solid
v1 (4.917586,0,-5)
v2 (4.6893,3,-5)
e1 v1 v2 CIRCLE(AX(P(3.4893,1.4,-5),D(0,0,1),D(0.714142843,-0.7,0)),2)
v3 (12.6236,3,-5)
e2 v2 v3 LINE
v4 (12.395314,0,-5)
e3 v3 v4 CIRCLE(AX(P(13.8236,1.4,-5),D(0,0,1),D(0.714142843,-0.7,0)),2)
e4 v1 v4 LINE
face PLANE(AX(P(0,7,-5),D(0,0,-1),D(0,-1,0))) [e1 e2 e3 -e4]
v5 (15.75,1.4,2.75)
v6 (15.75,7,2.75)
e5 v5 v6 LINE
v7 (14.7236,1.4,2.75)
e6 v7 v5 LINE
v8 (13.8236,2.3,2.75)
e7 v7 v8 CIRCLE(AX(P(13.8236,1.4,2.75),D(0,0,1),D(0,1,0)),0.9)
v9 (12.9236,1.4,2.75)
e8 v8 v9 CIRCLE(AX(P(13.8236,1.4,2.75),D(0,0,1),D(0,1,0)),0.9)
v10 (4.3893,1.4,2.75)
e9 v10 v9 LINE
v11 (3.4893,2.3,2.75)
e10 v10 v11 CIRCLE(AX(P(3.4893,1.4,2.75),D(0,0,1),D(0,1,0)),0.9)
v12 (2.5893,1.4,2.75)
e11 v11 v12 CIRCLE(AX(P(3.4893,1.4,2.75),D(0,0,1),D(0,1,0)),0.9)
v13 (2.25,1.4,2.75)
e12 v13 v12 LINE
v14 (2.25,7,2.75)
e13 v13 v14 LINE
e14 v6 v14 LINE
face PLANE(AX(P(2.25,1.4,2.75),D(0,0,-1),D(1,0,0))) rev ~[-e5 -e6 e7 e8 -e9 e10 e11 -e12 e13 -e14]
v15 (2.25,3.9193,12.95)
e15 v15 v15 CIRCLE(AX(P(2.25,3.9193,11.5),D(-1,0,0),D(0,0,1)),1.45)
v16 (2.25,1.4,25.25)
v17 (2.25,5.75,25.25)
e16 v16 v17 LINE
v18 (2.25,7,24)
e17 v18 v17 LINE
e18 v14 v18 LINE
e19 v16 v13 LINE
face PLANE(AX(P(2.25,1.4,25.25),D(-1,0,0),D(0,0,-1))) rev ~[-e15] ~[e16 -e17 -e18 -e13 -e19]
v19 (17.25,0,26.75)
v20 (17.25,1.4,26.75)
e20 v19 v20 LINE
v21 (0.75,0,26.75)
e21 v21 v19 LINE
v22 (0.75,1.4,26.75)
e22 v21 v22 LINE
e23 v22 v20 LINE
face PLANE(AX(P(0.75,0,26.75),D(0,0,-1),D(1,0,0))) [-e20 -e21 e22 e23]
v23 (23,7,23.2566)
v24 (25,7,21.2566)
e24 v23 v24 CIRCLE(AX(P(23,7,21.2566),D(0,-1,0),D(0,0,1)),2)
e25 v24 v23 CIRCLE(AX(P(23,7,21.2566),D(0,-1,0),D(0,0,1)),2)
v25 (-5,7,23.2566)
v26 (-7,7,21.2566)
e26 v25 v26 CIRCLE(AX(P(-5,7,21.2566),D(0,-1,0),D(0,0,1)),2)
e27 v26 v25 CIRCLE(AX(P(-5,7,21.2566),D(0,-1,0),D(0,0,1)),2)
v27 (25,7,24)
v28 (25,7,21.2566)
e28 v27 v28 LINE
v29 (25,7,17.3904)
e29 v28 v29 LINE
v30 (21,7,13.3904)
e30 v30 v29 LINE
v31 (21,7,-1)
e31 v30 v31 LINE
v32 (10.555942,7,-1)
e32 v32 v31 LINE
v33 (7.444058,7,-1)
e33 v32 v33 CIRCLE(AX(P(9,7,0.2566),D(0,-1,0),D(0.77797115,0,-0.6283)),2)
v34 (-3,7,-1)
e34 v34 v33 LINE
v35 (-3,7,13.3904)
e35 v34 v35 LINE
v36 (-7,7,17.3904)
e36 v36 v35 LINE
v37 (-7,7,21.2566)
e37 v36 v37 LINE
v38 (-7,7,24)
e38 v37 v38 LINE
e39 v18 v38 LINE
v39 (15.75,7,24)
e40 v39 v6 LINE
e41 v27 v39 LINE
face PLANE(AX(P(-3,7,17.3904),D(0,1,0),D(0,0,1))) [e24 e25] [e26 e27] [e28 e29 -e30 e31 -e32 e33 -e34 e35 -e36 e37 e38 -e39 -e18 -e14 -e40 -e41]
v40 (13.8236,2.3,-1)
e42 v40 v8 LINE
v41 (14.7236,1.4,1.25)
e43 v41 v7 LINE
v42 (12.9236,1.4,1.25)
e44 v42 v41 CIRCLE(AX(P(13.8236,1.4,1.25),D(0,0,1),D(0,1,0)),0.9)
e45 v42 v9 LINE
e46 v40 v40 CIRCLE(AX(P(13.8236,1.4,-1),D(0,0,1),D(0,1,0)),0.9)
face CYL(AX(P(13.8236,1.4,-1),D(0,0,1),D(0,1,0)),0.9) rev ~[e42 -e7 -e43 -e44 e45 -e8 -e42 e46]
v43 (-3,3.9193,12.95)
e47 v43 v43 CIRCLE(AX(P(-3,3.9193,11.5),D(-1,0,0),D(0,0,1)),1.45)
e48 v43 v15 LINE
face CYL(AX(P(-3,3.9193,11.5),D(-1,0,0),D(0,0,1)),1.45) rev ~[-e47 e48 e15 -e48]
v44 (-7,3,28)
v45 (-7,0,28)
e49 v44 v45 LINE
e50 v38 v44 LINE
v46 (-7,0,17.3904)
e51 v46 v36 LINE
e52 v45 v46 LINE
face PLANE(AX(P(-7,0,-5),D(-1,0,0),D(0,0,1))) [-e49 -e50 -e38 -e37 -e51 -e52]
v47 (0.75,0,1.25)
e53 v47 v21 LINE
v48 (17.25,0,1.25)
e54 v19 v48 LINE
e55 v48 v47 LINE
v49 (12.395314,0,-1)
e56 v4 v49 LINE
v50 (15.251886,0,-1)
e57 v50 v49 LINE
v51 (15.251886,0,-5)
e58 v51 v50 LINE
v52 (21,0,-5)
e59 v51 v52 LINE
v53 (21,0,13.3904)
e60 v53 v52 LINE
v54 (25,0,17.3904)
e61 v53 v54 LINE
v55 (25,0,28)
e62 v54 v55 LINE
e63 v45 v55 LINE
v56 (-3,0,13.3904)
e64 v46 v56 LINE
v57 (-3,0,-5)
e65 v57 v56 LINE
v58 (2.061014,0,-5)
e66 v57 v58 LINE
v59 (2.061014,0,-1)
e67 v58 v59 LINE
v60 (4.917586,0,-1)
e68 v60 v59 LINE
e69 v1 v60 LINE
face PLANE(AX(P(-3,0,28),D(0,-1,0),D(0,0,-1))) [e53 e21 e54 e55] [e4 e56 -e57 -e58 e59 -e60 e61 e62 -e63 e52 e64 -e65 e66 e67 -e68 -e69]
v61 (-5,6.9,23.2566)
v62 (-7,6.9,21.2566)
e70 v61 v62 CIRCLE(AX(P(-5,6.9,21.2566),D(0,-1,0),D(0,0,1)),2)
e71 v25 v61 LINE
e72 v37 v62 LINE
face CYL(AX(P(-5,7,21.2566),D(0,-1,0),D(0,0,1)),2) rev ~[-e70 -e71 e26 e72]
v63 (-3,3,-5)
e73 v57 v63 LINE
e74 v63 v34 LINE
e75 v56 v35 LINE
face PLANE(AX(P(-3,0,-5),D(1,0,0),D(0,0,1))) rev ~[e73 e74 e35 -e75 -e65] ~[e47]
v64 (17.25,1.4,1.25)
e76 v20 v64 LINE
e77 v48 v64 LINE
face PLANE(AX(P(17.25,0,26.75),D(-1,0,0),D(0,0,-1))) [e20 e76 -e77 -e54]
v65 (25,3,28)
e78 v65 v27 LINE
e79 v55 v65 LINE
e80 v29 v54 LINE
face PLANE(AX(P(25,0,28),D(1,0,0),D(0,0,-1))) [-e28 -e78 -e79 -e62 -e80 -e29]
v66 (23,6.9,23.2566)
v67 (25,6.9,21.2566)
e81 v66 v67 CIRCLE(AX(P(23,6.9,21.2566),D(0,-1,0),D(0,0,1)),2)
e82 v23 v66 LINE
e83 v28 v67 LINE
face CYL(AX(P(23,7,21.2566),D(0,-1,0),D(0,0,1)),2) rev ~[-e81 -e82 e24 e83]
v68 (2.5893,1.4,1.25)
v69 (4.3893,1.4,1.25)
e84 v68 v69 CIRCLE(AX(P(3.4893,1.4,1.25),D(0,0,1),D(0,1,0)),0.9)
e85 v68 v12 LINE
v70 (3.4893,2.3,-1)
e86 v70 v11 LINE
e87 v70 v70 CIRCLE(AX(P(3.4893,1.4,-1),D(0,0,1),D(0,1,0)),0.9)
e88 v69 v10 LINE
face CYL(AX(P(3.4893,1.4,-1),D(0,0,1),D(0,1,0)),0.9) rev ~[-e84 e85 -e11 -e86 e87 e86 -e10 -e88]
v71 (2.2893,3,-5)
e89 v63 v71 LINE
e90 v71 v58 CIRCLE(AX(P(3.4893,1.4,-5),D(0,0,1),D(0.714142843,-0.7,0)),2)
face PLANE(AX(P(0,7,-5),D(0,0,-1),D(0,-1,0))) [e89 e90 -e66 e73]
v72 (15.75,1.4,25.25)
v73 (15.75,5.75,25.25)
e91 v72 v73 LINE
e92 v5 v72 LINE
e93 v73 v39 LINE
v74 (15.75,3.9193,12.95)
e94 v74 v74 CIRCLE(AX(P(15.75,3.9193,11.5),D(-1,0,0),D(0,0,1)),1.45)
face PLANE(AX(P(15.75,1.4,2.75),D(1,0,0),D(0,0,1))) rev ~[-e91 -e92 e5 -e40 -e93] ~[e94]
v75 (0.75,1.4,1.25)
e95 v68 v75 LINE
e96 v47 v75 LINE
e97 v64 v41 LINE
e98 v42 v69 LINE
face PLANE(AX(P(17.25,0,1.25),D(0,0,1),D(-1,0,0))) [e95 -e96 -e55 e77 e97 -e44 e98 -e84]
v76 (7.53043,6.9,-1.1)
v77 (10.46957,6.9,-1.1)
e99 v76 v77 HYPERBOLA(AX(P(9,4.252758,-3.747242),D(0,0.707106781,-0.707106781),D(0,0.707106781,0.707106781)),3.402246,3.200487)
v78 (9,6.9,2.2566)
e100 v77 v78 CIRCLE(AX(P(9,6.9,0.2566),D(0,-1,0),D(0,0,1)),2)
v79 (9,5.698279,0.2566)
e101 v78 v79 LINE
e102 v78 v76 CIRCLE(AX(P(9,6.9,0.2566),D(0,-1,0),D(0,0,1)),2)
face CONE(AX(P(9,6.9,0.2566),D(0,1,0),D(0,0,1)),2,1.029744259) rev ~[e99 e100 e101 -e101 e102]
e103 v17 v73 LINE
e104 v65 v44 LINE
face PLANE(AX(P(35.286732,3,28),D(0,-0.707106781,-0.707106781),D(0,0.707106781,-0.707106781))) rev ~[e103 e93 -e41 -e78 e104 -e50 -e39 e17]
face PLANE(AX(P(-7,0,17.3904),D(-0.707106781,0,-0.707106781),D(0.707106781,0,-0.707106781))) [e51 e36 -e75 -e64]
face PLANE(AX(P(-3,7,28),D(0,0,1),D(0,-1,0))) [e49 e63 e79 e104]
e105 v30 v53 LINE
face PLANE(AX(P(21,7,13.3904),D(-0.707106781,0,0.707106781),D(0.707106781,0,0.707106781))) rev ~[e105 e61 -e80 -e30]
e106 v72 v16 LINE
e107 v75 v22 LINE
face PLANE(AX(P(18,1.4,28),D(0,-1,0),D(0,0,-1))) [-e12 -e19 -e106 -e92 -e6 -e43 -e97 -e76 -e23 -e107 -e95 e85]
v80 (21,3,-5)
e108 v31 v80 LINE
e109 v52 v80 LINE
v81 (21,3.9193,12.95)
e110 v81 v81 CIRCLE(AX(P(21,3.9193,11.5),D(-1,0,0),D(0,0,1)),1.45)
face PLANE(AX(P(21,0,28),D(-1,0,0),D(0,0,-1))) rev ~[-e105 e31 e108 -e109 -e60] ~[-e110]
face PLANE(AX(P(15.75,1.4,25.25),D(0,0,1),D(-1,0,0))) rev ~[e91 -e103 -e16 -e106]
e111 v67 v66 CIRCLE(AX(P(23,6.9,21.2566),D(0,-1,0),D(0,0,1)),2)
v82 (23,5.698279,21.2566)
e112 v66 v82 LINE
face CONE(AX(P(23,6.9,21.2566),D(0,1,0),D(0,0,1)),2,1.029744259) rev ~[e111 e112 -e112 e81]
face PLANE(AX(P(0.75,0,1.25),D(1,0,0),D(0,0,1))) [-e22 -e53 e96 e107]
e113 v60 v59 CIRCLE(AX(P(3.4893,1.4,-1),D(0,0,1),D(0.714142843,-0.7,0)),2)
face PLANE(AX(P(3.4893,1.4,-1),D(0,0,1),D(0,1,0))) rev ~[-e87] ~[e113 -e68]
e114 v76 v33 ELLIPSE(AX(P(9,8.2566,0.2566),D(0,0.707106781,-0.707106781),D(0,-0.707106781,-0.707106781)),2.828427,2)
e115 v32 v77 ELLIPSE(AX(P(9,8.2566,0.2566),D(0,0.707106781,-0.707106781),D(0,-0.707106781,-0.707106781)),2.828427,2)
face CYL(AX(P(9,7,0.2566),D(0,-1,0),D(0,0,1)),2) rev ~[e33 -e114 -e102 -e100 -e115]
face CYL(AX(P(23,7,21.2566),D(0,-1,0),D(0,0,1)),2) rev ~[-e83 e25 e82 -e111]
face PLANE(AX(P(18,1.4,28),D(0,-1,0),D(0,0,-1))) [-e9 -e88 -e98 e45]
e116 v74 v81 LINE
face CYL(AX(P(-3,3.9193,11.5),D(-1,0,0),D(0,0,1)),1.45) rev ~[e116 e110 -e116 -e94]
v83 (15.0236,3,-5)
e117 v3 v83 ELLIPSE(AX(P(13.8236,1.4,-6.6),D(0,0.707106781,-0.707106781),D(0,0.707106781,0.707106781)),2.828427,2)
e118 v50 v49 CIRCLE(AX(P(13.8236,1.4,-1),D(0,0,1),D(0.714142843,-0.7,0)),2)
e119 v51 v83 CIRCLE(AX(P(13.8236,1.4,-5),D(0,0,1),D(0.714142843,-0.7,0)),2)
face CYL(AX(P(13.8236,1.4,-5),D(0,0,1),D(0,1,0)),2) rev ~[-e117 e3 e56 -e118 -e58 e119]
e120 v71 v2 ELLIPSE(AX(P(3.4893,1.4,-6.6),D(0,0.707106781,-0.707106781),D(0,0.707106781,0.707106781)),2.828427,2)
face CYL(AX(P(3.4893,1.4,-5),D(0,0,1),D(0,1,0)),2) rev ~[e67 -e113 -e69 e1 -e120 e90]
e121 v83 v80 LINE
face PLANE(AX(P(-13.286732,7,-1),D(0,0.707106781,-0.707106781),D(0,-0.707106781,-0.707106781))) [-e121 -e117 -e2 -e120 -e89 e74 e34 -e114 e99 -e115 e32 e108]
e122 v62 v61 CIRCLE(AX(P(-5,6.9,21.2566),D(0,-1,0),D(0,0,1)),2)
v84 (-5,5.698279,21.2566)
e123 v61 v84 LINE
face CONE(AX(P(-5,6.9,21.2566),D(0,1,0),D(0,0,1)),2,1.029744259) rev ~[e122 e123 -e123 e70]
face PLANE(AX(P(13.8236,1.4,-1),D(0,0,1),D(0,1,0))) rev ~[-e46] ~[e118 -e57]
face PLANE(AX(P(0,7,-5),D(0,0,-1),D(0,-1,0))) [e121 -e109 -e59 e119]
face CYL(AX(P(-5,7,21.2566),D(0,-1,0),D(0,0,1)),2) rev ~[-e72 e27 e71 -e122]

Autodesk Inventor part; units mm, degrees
ref_plane "YZ Plane" through (0, 0, 0) normal (1, 0, 0) x (0, 1, 0)
ref_plane "XZ Plane" through (0, 0, 0) normal (0, 1, 0) x (-1, 0, 0)
ref_plane "XY Plane" through (0, 0, 0) normal (0, 0, 1) x (1, 0, 0)
sketch "Skizze1" plane through (0, 0, 0) normal (0, 1, 0) x (-1, 0, 0)
  line L0 (0, 0) -> (-18, 0)
  line L1 (-18, 0) -> (-18, 28)
  line L2 (-18, 28) -> (0, 28)
  line L3 (0, 28) -> (0, 0)
  dimension "d0" = 18
  dimension "d1" = 28
extrude "Extrusion1" add sketch "Skizze1" along normal blind 7
sketch "Skizze2" plane through (18, 0, 28) normal (0, -1, 0) x (0, 0, -1)
  line L0 (0, -18) -> (0, 0) projected
  line L1 (28, -18) -> (0, -18) projected
  line L2 (28, 0) -> (28, -18) projected
  line L3 (0, 0) -> (28, 0) projected
  line L4 (26.75, -17.25) -> (1.25, -17.25)
  line L5 (1.25, -17.25) -> (1.25, -0.75)
  line L6 (1.25, -0.75) -> (26.75, -0.75)
  line L7 (26.75, -0.75) -> (26.75, -17.25)
  line L8 (26.75, -17.25) -> (1.25, -0.75) construction
  line L9 (1.25, -17.25) -> (26.75, -0.75) construction
  point P0 (14, -9)
  dimension "d16" = 25.5
  dimension "d17" = 16.5
extrude "Extrusion2" cut sketch "Skizze2" against normal blind 1.4 contours L4 L5 L6 L7
sketch "Skizze5" plane through (18, 1.4, 28) normal (0, -1, 0) x (1, 0, 0)
  line L0 (-0.75, -1.25) -> (-0.75, -26.75) projected
  line L1 (-17.25, -1.25) -> (-0.75, -1.25) projected
  line L2 (-17.25, -26.75) -> (-17.25, -1.25) projected
  line L3 (-0.75, -26.75) -> (-17.25, -26.75) projected
  line L4 (-2.25, -25.25) -> (-2.25, -2.75)
  line L5 (-2.25, -2.75) -> (-15.75, -2.75)
  line L6 (-15.75, -2.75) -> (-15.75, -25.25)
  line L7 (-15.75, -25.25) -> (-2.25, -25.25)
  point P0 (-18, -28)
  dimension "d18" = 1.5
extrude "Extrusion5" cut sketch "Skizze5" against normal blind 6 contours L7 L6 L5 L4
ref_plane "Arbeitsebene2" through (9, 0, 0) normal (-0.7071068, 0, -0.7071068) x (0, 1, 0)
ref_plane "Arbeitsebene1" through (9, 0, 0) normal (-1, 0, 0) x (0, 0, 1)
ref_plane "Arbeitsebene3" through (0, 0, 14) normal (0, 0, 1) x (1, 0, 0)
sketch "Skizze6" plane through (0, 0, 0) normal (-1, 0, 0) x (0, 0, 1)
  line L0 (0, 7) -> (28, 7) projected
  line L1 (0, 0) -> (0, 7) projected
  line L2 (0, 0) -> (28, 0) projected
  line L3 (28, 0) -> (28, 7) projected
  line L4 (0, 7) -> (-5, 7)
  line L5 (-5, 7) -> (-5, 0)
  line L6 (-5, 0) -> (0, 0)
  line L7 (0, 0) -> (0, 7)
  dimension "d24" = 5
extrude "Extrusion6" add sketch "Skizze6" against normal up to surface (18 mm away) contours L1 L6 L5 L4
ref_plane "Arbeitsebene4" through (-15.85, 34.426, 14.0849) normal (0, 0.7071068, -0.7071068) x (1, 0, 0)
sketch "Skizze7" plane through (-15.85, 34.426, 14.0849) normal (0, 0.7071068, -0.7071068) x (1, 0, 0)
  point P0 (15.85, 34.3024)
sketch "Skizze8" plane through (0, 0, 0) normal (0, -1, 0) x (1, 0, 0)
  line L0 (0.75, 26.75) -> (17.25, 26.75) projected
  line L1 (17.25, 26.75) -> (17.25, 1.25) projected
  line L2 (17.25, 1.25) -> (0.75, 1.25) projected
  line L3 (0.75, 1.25) -> (0.75, 26.75) projected
  line L4 (0, 28) -> (18, 28) projected
  line L5 (18, 28) -> (18, -5) projected
  line L6 (0, -5) -> (0, 28) projected
  line L7 (0, -5) -> (-3, -5)
  line L8 (-3, -5) -> (-3, 28)
  line L9 (-3, 28) -> (0, 28)
  line L10 (0, 28) -> (0, -5)
  line L11 (18, 28) -> (18, -5) projected
  line L12 (18, 28) -> (21, 28)
  line L13 (21, 28) -> (21, -5)
  line L14 (21, -5) -> (18, -5)
  line L15 (18, -5) -> (18, 28)
  line L16 (0, -5) -> (0, 28) projected
  line L17 (0, -5) -> (18, -5) projected
  point P0 (0, 0)
  dimension "d27" = 3
  dimension "d28" = 3
extrude "Extrusion7" add sketch "Skizze8" against normal blind 7 contours L6 L7 L8 L9 | L12 L13 L14 L5
ref_plane "Arbeitsebene5" through (21, -5.7279, 12.7279) normal (0, 0.7071068, -0.7071068) x (-1, 0, 0)
sketch "Skizze10" plane through (-3, 0, -5) normal (-1, 0, 0) x (0, 0, 1)
  line L0 (0, 7) -> (33, 7) projected
  line L1 (0, 0) -> (0, 7) projected
  line L2 (33, 0) -> (0, 0) projected
  line L3 (33, 0) -> (33, 7) projected
  circle A0 centre (16.5, 3.9193) radius 1.45
  point P0 (5, 0)
  dimension "d38" = 2.9
extrude "Extrusion9" cut sketch "Skizze10" against normal through all contours A0
ref_plane "Arbeitsebene6" through (21, -1.4853, 8.4853) normal (0, 0.7071068, -0.7071068) x (-1, 0, 0)
sketch "Skizze14" plane through (21, 0, -5) normal (0, 0, -1) x (-1, 0, 0)
  line L0 (24, 0) -> (0, 0) projected
  line L1 (3.75, 1.4) -> (20.25, 1.4) projected
  circle A0 centre (17.5107, 1.4) radius 0.9
  circle A1 centre (7.1764, 1.4) radius 1.0097
  point P0 (21, 0)
  dimension "d55" = 1.8
hole "Bohrung3" at (3.4893, 1.4, -5) at (13.8236, 1.4, -5) direction (0, 0, 1) diameter 1.8 depth 10 tip angle 118 counterbore diameter 4 counterbore depth 4
sketch "Skizze15" plane through (21, 0, 28) normal (1, 0, 0) x (0, 0, -1)
  circle A0 centre (16.5, 3.9193) radius 1.45 projected
  line L0 (0, 7) -> (33, 7) projected
  line L1 (0, 0) -> (0, 7) projected
  line L2 (33, 0) -> (0, 0) projected
  line L3 (33, 0) -> (33, 7) projected
  line L4 (25.25, 7) -> (5, 7) projected
  line L5 (10.6096, 7) -> (10.6096, 0)
  point P0 (28, 0)
extrude "Extrusion10" add sketch "Skizze15" along normal blind 4 contours L0 L5 L2 L1
sketch "Skizze16" plane through (-3, 0, -5) normal (-1, 0, 0) x (0, 0, 1)
  line L0 (33, 7) -> (33, 0) projected
  line L1 (33, 0) -> (22.3904, 0) projected
  line L2 (22.3904, 0) -> (22.3904, 7) projected
  line L3 (22.3904, 7) -> (33, 7) projected
  point P0 (5, 0)
extrude "Extrusion11" add sketch "Skizze16" along normal blind 4
sketch "Skizze13" plane through (21, 7, 8.4853) normal (0, 1, 0) x (-1, 0, 0)
  circle A0 centre (-2, 12.7713) radius 2.45 projected
  circle A1 centre (26, 12.7713) radius 2.45 projected
  circle A2 centre (12, -8.2287) radius 2.75 projected
  point P0 (21, -4.9497)
  point P1 (12, -10.2287)
hole "Bohrung2" at (23, 7, 21.2566) at (-5, 7, 21.2566) at (9, 7, 0.2566) direction (0, -1, 0) diameter 4 depth 0.1 tip angle 118
chamfer "Fase3" distance 4 angle 45 4 edges at (21, 3.5, 17.3904) (-3, 3.5, 17.3904) (9, 7, 28) (9, 7, -5)
properties part number "20_Cube_Insert_Fibercombiner_FPC_filtermount_v3"
